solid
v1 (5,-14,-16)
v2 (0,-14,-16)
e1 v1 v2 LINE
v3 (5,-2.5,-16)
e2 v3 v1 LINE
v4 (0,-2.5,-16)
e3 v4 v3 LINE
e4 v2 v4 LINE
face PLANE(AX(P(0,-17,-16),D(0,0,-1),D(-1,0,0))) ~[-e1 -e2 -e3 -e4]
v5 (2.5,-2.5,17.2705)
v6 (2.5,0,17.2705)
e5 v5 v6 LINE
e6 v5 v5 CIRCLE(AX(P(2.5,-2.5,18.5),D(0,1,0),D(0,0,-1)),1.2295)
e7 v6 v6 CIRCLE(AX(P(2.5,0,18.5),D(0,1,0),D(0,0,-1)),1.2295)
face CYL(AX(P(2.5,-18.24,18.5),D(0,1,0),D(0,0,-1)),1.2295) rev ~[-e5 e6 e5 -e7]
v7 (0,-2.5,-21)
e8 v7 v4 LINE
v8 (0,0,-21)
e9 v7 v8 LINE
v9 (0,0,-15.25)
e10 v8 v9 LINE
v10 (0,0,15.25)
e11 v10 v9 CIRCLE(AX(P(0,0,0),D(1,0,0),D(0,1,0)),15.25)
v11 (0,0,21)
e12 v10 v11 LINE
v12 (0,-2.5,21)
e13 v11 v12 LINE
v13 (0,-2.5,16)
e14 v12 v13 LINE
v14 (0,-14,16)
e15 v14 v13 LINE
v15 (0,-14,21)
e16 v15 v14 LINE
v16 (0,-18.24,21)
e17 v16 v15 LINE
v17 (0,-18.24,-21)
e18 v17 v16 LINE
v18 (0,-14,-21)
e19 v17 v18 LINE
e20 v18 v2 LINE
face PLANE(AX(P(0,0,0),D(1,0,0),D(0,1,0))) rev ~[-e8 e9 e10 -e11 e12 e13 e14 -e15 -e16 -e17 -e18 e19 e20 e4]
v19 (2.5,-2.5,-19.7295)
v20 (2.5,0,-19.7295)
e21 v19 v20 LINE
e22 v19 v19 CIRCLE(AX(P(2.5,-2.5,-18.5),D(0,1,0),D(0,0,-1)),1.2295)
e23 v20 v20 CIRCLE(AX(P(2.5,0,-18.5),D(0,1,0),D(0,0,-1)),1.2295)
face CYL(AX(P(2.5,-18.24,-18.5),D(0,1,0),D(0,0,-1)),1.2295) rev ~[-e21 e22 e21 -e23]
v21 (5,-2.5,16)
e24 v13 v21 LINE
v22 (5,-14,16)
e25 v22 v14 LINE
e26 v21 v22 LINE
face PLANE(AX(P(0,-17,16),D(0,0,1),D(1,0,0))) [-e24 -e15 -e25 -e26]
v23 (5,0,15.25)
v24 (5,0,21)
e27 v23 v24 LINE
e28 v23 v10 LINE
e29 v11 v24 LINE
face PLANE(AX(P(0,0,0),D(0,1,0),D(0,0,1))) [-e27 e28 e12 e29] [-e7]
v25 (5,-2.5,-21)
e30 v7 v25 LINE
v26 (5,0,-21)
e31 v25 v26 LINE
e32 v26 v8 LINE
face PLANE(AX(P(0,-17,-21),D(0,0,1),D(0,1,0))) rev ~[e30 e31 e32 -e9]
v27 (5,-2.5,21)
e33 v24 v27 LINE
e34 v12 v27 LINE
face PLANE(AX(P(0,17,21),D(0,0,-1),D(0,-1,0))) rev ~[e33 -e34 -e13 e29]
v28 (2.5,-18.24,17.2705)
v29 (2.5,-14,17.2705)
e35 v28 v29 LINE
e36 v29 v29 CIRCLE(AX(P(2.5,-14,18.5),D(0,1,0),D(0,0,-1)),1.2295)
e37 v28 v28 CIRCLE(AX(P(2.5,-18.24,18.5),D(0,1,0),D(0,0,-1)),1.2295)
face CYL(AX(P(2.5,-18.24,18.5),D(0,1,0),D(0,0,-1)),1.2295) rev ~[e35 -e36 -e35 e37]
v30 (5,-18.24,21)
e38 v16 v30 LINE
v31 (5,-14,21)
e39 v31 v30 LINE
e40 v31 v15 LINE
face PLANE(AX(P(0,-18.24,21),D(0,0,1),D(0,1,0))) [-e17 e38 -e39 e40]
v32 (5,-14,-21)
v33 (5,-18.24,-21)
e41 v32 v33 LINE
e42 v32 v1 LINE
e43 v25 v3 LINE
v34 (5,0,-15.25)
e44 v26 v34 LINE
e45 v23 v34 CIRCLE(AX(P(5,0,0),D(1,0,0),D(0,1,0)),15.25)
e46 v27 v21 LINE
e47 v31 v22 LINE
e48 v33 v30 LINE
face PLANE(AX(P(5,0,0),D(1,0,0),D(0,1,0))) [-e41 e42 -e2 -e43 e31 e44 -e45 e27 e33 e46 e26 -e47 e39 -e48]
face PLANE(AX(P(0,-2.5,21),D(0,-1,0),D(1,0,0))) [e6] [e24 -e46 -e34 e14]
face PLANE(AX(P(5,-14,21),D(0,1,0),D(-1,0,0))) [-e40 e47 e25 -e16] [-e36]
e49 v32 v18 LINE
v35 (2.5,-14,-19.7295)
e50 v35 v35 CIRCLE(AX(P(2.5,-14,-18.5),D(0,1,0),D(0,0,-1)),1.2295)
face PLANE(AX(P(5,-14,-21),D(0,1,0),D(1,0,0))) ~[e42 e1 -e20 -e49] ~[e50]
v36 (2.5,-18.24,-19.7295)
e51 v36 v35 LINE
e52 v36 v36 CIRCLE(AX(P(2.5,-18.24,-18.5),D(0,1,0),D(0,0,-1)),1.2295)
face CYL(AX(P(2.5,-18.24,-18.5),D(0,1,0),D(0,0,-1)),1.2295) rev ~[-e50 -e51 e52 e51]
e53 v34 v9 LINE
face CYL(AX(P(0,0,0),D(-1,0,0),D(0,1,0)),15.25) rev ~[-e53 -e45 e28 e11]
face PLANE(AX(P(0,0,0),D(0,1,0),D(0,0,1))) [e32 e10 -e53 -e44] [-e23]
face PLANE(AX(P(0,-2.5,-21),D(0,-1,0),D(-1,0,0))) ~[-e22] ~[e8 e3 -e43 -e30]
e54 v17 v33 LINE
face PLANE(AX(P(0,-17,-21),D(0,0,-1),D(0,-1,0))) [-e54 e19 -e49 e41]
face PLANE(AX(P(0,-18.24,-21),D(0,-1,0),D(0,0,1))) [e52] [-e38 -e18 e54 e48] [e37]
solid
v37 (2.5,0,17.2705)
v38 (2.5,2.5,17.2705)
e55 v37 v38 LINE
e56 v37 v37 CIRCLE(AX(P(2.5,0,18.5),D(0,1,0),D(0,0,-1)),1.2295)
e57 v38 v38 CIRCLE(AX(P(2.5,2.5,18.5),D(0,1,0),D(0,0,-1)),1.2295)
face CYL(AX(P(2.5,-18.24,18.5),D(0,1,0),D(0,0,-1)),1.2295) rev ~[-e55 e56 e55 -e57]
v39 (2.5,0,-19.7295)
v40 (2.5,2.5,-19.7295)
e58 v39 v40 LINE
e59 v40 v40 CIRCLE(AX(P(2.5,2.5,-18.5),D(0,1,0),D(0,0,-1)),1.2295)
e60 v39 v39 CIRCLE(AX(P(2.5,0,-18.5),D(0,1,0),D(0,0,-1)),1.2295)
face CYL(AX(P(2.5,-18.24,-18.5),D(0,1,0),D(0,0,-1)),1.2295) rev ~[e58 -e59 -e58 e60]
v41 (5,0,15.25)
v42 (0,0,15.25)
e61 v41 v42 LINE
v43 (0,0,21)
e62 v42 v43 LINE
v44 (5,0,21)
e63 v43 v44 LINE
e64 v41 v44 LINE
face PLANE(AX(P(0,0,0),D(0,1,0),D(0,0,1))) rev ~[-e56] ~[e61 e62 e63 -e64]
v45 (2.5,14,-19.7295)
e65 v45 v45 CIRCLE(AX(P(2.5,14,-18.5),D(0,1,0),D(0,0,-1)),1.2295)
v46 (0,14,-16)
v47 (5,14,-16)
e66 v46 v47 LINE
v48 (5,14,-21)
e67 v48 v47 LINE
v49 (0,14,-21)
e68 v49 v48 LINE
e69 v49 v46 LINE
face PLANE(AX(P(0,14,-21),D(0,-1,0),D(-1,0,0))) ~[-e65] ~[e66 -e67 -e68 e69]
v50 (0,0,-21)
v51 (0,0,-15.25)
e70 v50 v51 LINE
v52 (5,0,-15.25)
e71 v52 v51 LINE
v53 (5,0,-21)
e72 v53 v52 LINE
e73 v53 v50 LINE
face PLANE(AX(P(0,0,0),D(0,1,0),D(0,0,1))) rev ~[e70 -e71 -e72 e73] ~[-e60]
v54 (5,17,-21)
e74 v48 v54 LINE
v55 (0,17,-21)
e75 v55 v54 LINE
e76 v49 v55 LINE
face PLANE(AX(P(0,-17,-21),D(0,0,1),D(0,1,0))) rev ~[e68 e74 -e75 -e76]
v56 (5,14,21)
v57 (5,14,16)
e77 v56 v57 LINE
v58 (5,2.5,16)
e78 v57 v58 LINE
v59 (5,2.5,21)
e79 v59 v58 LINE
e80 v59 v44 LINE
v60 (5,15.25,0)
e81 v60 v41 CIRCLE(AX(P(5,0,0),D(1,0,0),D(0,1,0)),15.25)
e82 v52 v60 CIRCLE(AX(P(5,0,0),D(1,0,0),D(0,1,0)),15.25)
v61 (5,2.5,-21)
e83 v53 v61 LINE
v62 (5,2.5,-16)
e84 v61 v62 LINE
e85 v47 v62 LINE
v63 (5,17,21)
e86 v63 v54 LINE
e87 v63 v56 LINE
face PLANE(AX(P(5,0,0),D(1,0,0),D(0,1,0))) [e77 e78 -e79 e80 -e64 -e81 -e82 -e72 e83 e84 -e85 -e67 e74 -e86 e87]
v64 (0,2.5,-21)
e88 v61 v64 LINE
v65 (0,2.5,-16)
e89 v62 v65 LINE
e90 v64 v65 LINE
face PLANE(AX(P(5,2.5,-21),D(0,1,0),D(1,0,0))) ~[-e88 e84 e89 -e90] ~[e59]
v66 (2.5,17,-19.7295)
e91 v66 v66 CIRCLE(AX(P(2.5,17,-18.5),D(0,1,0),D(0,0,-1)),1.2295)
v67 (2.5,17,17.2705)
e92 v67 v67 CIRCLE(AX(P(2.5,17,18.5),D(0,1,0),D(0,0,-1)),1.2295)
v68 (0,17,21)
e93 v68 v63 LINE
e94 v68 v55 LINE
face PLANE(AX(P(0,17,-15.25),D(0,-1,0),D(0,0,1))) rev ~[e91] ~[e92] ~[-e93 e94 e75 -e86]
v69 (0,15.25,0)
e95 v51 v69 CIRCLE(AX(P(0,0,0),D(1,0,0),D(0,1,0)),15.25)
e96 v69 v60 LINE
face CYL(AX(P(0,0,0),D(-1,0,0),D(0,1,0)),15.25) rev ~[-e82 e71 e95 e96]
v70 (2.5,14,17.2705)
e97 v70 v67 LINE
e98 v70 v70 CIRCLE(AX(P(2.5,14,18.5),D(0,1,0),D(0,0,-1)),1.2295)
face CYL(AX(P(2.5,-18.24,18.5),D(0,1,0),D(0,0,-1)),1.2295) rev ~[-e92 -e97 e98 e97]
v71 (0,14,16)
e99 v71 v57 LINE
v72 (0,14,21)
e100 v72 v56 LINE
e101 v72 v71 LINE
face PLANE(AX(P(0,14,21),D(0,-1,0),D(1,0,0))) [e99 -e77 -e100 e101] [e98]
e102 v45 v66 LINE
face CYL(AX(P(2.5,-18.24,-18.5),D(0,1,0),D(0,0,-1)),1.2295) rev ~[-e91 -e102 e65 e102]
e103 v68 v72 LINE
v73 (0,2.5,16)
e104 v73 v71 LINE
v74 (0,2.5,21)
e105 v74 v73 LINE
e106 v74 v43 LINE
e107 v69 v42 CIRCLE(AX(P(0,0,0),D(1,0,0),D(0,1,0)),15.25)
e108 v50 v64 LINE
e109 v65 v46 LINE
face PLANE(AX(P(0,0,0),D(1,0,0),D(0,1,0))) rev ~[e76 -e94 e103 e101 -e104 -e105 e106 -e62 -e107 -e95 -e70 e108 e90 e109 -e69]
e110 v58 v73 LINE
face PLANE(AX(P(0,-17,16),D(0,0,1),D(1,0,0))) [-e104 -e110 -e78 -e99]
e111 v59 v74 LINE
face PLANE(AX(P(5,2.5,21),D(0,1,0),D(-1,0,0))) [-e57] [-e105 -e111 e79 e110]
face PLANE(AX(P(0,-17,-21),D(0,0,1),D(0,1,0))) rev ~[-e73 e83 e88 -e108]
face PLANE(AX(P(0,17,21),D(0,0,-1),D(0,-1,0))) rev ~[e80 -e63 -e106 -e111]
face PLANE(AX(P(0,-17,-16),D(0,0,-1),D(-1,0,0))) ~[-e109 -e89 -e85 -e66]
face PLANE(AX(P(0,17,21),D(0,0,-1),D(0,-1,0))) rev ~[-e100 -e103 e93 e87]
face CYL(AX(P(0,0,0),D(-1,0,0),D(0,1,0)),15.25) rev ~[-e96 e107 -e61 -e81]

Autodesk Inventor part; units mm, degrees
ref_plane "YZ Plane" through (0, 0, 0) normal (1, 0, 0) x (0, 1, 0)
ref_plane "XZ Plane" through (0, 0, 0) normal (0, 1, 0) x (-1, 0, 0)
ref_plane "XY Plane" through (0, 0, 0) normal (0, 0, 1) x (1, 0, 0)
sketch "Sketch1" plane through (0, 0, 0) normal (1, 0, 0) x (0, 1, 0)
  circle A0 centre (0, 0) radius 15.25
  line L0 (15.25, 15.25) -> (-15.25, 15.25)
  line L1 (-15.25, 15.25) -> (-15.25, -15.25) construction
  line L2 (-15.25, -15.25) -> (15.25, -15.25)
  line L3 (15.25, -15.25) -> (15.25, 15.25) construction
  line L4 (15.25, 15.25) -> (-15.25, -15.25) construction
  line L5 (-15.25, 15.25) -> (15.25, -15.25) construction
  line L6 (17, 21) -> (-17, 21)
  line L7 (-17, 21) -> (-17, -21)
  line L8 (-17, -21) -> (17, -21)
  line L9 (17, -21) -> (17, 21)
  line L10 (17, 21) -> (-17, -21) construction
  line L11 (-17, 21) -> (17, -21) construction
  circle A1 centre (13.25, -13.25) radius 1
  circle A2 centre (13.25, 12.75) radius 1
  circle A3 centre (-12.75, -13.25) radius 1
  circle A4 centre (-12.75, 12.75) radius 1
  line L12 (17, -15.25) -> (15.25, -15.25)
  line L13 (-15.25, -15.25) -> (-17, -15.25)
  line L14 (17, 15.25) -> (15.25, 15.25)
  line L15 (-15.25, 15.25) -> (-17, 15.25)
  line L16 (-17, -21) -> (-18.24, -21)
  line L17 (-18.24, -21) -> (-18.24, 21)
  line L18 (-18.24, 21) -> (-17, 21)
  line L19 (-17, 21) -> (-17, -21)
  point P0 (0, -15.25)
  point P1 (0, 15.25)
  point P2 (0, 21)
  dimension "d0" = 30.5
  dimension "d1" = 42
  dimension "d2" = 34
  dimension "d10" = 2
  dimension "d11" = 2
  dimension "d14" = 26
  dimension "d17" = 26
  dimension "d60" = 18.24
sketch "Sketch2" plane through (0, 0, 0) normal (0, 1, 0) x (-1, 0, 0)
  line L0 (190, 50) -> (-10, 50)
  line L1 (-10, 50) -> (-10, -50)
  line L2 (-10, -50) -> (190, -50)
  line L3 (190, -50) -> (190, 50)
  point P0 (0, 0)
  point P1 (-10, 0)
  dimension "d3" = 200
  dimension "d4" = 100
  dimension "d5" = 10
extrude "Extrusion1" add sketch "Sketch1" along normal blind 5 contours A0 | A0 L0 L14 L9 L12 L2 | L0 L15 L7 L6 L9 L14 | A0 L2 L13 L7 L15 L0 | L2 L12 L9 L8 L7 L13 | A1 | A2 | A3 | A4
extrude "Extrusion4" [suppressed]
extrude "Extrusion3" cut sketch "Sketch1" along normal blind 5 contours A0
sketch "Sketch3" plane through (0, -17, 21) normal (0, 0, 1) x (1, 0, 0)
  line L0 (0, 0) -> (5, 0) projected
  line L1 (-1.7766, 34.0102) -> (-1.7765, 34.01)
  line L2 (0, 14.5) -> (5, 14.5)
  line L3 (5, 14.5) -> (5, 3)
  line L4 (5, 3) -> (0, 3)
  line L5 (0, 3) -> (0, 14.5)
  line L6 (0, 31) -> (5, 31)
  line L7 (5, 31) -> (5, 19.5)
  line L8 (5, 19.5) -> (0, 19.5)
  line L9 (0, 19.5) -> (0, 31)
  line L10 (0, 34) -> (5, 34) projected
  line L11 (0, 34) -> (0, 0) projected
  line L12 (5, 34) -> (5, 0) projected
  point P0 (0.0059, 34)
  dimension "d26" = 3
  dimension "d27" = 5
  dimension "d43" = 3
extrude "Extrusion5" cut sketch "Sketch3" against normal blind 5 contours L5 L2 L3 L4 | L9 L6 L7 L8
mirror "Mirror1" about plane through (0, 0, 0) normal (0, 0, 1) of "Extrusion5"
extrude "Extrusion7" add sketch "Sketch1" along normal blind 5 contours L7 L16 L17 L18
sketch "Sketch5" plane through (0, -18.24, -21) normal (0, -1, 0) x (1, 0, 0)
  line L0 (5, 42) -> (5, 0) projected
  line L1 (0, 0) -> (5, 0) projected
  line L2 (0, 42) -> (5, 42) projected
  point P0 (0, 21)
  point P1 (2.5, 2.5)
  point P2 (2.5, 39.5)
  dimension "d56" = 2.5
  dimension "d57" = 2.5
  dimension "d58" = 2.5
  dimension "d59" = 2.5
hole "Hole2" at (2.5, -18.24, -18.5) at (2.5, -18.24, 18.5) direction (0, 1, 0) diameter 2.459 end through all thread size "M3x0.5" class "6H" standard "ISO Metric profile"
split body "Split1" result two bodies by plane through (0, 0, 0) normal (0, 1, 0) first body at (0.5, 16.4167, 0)
properties part number "Laser holder"
